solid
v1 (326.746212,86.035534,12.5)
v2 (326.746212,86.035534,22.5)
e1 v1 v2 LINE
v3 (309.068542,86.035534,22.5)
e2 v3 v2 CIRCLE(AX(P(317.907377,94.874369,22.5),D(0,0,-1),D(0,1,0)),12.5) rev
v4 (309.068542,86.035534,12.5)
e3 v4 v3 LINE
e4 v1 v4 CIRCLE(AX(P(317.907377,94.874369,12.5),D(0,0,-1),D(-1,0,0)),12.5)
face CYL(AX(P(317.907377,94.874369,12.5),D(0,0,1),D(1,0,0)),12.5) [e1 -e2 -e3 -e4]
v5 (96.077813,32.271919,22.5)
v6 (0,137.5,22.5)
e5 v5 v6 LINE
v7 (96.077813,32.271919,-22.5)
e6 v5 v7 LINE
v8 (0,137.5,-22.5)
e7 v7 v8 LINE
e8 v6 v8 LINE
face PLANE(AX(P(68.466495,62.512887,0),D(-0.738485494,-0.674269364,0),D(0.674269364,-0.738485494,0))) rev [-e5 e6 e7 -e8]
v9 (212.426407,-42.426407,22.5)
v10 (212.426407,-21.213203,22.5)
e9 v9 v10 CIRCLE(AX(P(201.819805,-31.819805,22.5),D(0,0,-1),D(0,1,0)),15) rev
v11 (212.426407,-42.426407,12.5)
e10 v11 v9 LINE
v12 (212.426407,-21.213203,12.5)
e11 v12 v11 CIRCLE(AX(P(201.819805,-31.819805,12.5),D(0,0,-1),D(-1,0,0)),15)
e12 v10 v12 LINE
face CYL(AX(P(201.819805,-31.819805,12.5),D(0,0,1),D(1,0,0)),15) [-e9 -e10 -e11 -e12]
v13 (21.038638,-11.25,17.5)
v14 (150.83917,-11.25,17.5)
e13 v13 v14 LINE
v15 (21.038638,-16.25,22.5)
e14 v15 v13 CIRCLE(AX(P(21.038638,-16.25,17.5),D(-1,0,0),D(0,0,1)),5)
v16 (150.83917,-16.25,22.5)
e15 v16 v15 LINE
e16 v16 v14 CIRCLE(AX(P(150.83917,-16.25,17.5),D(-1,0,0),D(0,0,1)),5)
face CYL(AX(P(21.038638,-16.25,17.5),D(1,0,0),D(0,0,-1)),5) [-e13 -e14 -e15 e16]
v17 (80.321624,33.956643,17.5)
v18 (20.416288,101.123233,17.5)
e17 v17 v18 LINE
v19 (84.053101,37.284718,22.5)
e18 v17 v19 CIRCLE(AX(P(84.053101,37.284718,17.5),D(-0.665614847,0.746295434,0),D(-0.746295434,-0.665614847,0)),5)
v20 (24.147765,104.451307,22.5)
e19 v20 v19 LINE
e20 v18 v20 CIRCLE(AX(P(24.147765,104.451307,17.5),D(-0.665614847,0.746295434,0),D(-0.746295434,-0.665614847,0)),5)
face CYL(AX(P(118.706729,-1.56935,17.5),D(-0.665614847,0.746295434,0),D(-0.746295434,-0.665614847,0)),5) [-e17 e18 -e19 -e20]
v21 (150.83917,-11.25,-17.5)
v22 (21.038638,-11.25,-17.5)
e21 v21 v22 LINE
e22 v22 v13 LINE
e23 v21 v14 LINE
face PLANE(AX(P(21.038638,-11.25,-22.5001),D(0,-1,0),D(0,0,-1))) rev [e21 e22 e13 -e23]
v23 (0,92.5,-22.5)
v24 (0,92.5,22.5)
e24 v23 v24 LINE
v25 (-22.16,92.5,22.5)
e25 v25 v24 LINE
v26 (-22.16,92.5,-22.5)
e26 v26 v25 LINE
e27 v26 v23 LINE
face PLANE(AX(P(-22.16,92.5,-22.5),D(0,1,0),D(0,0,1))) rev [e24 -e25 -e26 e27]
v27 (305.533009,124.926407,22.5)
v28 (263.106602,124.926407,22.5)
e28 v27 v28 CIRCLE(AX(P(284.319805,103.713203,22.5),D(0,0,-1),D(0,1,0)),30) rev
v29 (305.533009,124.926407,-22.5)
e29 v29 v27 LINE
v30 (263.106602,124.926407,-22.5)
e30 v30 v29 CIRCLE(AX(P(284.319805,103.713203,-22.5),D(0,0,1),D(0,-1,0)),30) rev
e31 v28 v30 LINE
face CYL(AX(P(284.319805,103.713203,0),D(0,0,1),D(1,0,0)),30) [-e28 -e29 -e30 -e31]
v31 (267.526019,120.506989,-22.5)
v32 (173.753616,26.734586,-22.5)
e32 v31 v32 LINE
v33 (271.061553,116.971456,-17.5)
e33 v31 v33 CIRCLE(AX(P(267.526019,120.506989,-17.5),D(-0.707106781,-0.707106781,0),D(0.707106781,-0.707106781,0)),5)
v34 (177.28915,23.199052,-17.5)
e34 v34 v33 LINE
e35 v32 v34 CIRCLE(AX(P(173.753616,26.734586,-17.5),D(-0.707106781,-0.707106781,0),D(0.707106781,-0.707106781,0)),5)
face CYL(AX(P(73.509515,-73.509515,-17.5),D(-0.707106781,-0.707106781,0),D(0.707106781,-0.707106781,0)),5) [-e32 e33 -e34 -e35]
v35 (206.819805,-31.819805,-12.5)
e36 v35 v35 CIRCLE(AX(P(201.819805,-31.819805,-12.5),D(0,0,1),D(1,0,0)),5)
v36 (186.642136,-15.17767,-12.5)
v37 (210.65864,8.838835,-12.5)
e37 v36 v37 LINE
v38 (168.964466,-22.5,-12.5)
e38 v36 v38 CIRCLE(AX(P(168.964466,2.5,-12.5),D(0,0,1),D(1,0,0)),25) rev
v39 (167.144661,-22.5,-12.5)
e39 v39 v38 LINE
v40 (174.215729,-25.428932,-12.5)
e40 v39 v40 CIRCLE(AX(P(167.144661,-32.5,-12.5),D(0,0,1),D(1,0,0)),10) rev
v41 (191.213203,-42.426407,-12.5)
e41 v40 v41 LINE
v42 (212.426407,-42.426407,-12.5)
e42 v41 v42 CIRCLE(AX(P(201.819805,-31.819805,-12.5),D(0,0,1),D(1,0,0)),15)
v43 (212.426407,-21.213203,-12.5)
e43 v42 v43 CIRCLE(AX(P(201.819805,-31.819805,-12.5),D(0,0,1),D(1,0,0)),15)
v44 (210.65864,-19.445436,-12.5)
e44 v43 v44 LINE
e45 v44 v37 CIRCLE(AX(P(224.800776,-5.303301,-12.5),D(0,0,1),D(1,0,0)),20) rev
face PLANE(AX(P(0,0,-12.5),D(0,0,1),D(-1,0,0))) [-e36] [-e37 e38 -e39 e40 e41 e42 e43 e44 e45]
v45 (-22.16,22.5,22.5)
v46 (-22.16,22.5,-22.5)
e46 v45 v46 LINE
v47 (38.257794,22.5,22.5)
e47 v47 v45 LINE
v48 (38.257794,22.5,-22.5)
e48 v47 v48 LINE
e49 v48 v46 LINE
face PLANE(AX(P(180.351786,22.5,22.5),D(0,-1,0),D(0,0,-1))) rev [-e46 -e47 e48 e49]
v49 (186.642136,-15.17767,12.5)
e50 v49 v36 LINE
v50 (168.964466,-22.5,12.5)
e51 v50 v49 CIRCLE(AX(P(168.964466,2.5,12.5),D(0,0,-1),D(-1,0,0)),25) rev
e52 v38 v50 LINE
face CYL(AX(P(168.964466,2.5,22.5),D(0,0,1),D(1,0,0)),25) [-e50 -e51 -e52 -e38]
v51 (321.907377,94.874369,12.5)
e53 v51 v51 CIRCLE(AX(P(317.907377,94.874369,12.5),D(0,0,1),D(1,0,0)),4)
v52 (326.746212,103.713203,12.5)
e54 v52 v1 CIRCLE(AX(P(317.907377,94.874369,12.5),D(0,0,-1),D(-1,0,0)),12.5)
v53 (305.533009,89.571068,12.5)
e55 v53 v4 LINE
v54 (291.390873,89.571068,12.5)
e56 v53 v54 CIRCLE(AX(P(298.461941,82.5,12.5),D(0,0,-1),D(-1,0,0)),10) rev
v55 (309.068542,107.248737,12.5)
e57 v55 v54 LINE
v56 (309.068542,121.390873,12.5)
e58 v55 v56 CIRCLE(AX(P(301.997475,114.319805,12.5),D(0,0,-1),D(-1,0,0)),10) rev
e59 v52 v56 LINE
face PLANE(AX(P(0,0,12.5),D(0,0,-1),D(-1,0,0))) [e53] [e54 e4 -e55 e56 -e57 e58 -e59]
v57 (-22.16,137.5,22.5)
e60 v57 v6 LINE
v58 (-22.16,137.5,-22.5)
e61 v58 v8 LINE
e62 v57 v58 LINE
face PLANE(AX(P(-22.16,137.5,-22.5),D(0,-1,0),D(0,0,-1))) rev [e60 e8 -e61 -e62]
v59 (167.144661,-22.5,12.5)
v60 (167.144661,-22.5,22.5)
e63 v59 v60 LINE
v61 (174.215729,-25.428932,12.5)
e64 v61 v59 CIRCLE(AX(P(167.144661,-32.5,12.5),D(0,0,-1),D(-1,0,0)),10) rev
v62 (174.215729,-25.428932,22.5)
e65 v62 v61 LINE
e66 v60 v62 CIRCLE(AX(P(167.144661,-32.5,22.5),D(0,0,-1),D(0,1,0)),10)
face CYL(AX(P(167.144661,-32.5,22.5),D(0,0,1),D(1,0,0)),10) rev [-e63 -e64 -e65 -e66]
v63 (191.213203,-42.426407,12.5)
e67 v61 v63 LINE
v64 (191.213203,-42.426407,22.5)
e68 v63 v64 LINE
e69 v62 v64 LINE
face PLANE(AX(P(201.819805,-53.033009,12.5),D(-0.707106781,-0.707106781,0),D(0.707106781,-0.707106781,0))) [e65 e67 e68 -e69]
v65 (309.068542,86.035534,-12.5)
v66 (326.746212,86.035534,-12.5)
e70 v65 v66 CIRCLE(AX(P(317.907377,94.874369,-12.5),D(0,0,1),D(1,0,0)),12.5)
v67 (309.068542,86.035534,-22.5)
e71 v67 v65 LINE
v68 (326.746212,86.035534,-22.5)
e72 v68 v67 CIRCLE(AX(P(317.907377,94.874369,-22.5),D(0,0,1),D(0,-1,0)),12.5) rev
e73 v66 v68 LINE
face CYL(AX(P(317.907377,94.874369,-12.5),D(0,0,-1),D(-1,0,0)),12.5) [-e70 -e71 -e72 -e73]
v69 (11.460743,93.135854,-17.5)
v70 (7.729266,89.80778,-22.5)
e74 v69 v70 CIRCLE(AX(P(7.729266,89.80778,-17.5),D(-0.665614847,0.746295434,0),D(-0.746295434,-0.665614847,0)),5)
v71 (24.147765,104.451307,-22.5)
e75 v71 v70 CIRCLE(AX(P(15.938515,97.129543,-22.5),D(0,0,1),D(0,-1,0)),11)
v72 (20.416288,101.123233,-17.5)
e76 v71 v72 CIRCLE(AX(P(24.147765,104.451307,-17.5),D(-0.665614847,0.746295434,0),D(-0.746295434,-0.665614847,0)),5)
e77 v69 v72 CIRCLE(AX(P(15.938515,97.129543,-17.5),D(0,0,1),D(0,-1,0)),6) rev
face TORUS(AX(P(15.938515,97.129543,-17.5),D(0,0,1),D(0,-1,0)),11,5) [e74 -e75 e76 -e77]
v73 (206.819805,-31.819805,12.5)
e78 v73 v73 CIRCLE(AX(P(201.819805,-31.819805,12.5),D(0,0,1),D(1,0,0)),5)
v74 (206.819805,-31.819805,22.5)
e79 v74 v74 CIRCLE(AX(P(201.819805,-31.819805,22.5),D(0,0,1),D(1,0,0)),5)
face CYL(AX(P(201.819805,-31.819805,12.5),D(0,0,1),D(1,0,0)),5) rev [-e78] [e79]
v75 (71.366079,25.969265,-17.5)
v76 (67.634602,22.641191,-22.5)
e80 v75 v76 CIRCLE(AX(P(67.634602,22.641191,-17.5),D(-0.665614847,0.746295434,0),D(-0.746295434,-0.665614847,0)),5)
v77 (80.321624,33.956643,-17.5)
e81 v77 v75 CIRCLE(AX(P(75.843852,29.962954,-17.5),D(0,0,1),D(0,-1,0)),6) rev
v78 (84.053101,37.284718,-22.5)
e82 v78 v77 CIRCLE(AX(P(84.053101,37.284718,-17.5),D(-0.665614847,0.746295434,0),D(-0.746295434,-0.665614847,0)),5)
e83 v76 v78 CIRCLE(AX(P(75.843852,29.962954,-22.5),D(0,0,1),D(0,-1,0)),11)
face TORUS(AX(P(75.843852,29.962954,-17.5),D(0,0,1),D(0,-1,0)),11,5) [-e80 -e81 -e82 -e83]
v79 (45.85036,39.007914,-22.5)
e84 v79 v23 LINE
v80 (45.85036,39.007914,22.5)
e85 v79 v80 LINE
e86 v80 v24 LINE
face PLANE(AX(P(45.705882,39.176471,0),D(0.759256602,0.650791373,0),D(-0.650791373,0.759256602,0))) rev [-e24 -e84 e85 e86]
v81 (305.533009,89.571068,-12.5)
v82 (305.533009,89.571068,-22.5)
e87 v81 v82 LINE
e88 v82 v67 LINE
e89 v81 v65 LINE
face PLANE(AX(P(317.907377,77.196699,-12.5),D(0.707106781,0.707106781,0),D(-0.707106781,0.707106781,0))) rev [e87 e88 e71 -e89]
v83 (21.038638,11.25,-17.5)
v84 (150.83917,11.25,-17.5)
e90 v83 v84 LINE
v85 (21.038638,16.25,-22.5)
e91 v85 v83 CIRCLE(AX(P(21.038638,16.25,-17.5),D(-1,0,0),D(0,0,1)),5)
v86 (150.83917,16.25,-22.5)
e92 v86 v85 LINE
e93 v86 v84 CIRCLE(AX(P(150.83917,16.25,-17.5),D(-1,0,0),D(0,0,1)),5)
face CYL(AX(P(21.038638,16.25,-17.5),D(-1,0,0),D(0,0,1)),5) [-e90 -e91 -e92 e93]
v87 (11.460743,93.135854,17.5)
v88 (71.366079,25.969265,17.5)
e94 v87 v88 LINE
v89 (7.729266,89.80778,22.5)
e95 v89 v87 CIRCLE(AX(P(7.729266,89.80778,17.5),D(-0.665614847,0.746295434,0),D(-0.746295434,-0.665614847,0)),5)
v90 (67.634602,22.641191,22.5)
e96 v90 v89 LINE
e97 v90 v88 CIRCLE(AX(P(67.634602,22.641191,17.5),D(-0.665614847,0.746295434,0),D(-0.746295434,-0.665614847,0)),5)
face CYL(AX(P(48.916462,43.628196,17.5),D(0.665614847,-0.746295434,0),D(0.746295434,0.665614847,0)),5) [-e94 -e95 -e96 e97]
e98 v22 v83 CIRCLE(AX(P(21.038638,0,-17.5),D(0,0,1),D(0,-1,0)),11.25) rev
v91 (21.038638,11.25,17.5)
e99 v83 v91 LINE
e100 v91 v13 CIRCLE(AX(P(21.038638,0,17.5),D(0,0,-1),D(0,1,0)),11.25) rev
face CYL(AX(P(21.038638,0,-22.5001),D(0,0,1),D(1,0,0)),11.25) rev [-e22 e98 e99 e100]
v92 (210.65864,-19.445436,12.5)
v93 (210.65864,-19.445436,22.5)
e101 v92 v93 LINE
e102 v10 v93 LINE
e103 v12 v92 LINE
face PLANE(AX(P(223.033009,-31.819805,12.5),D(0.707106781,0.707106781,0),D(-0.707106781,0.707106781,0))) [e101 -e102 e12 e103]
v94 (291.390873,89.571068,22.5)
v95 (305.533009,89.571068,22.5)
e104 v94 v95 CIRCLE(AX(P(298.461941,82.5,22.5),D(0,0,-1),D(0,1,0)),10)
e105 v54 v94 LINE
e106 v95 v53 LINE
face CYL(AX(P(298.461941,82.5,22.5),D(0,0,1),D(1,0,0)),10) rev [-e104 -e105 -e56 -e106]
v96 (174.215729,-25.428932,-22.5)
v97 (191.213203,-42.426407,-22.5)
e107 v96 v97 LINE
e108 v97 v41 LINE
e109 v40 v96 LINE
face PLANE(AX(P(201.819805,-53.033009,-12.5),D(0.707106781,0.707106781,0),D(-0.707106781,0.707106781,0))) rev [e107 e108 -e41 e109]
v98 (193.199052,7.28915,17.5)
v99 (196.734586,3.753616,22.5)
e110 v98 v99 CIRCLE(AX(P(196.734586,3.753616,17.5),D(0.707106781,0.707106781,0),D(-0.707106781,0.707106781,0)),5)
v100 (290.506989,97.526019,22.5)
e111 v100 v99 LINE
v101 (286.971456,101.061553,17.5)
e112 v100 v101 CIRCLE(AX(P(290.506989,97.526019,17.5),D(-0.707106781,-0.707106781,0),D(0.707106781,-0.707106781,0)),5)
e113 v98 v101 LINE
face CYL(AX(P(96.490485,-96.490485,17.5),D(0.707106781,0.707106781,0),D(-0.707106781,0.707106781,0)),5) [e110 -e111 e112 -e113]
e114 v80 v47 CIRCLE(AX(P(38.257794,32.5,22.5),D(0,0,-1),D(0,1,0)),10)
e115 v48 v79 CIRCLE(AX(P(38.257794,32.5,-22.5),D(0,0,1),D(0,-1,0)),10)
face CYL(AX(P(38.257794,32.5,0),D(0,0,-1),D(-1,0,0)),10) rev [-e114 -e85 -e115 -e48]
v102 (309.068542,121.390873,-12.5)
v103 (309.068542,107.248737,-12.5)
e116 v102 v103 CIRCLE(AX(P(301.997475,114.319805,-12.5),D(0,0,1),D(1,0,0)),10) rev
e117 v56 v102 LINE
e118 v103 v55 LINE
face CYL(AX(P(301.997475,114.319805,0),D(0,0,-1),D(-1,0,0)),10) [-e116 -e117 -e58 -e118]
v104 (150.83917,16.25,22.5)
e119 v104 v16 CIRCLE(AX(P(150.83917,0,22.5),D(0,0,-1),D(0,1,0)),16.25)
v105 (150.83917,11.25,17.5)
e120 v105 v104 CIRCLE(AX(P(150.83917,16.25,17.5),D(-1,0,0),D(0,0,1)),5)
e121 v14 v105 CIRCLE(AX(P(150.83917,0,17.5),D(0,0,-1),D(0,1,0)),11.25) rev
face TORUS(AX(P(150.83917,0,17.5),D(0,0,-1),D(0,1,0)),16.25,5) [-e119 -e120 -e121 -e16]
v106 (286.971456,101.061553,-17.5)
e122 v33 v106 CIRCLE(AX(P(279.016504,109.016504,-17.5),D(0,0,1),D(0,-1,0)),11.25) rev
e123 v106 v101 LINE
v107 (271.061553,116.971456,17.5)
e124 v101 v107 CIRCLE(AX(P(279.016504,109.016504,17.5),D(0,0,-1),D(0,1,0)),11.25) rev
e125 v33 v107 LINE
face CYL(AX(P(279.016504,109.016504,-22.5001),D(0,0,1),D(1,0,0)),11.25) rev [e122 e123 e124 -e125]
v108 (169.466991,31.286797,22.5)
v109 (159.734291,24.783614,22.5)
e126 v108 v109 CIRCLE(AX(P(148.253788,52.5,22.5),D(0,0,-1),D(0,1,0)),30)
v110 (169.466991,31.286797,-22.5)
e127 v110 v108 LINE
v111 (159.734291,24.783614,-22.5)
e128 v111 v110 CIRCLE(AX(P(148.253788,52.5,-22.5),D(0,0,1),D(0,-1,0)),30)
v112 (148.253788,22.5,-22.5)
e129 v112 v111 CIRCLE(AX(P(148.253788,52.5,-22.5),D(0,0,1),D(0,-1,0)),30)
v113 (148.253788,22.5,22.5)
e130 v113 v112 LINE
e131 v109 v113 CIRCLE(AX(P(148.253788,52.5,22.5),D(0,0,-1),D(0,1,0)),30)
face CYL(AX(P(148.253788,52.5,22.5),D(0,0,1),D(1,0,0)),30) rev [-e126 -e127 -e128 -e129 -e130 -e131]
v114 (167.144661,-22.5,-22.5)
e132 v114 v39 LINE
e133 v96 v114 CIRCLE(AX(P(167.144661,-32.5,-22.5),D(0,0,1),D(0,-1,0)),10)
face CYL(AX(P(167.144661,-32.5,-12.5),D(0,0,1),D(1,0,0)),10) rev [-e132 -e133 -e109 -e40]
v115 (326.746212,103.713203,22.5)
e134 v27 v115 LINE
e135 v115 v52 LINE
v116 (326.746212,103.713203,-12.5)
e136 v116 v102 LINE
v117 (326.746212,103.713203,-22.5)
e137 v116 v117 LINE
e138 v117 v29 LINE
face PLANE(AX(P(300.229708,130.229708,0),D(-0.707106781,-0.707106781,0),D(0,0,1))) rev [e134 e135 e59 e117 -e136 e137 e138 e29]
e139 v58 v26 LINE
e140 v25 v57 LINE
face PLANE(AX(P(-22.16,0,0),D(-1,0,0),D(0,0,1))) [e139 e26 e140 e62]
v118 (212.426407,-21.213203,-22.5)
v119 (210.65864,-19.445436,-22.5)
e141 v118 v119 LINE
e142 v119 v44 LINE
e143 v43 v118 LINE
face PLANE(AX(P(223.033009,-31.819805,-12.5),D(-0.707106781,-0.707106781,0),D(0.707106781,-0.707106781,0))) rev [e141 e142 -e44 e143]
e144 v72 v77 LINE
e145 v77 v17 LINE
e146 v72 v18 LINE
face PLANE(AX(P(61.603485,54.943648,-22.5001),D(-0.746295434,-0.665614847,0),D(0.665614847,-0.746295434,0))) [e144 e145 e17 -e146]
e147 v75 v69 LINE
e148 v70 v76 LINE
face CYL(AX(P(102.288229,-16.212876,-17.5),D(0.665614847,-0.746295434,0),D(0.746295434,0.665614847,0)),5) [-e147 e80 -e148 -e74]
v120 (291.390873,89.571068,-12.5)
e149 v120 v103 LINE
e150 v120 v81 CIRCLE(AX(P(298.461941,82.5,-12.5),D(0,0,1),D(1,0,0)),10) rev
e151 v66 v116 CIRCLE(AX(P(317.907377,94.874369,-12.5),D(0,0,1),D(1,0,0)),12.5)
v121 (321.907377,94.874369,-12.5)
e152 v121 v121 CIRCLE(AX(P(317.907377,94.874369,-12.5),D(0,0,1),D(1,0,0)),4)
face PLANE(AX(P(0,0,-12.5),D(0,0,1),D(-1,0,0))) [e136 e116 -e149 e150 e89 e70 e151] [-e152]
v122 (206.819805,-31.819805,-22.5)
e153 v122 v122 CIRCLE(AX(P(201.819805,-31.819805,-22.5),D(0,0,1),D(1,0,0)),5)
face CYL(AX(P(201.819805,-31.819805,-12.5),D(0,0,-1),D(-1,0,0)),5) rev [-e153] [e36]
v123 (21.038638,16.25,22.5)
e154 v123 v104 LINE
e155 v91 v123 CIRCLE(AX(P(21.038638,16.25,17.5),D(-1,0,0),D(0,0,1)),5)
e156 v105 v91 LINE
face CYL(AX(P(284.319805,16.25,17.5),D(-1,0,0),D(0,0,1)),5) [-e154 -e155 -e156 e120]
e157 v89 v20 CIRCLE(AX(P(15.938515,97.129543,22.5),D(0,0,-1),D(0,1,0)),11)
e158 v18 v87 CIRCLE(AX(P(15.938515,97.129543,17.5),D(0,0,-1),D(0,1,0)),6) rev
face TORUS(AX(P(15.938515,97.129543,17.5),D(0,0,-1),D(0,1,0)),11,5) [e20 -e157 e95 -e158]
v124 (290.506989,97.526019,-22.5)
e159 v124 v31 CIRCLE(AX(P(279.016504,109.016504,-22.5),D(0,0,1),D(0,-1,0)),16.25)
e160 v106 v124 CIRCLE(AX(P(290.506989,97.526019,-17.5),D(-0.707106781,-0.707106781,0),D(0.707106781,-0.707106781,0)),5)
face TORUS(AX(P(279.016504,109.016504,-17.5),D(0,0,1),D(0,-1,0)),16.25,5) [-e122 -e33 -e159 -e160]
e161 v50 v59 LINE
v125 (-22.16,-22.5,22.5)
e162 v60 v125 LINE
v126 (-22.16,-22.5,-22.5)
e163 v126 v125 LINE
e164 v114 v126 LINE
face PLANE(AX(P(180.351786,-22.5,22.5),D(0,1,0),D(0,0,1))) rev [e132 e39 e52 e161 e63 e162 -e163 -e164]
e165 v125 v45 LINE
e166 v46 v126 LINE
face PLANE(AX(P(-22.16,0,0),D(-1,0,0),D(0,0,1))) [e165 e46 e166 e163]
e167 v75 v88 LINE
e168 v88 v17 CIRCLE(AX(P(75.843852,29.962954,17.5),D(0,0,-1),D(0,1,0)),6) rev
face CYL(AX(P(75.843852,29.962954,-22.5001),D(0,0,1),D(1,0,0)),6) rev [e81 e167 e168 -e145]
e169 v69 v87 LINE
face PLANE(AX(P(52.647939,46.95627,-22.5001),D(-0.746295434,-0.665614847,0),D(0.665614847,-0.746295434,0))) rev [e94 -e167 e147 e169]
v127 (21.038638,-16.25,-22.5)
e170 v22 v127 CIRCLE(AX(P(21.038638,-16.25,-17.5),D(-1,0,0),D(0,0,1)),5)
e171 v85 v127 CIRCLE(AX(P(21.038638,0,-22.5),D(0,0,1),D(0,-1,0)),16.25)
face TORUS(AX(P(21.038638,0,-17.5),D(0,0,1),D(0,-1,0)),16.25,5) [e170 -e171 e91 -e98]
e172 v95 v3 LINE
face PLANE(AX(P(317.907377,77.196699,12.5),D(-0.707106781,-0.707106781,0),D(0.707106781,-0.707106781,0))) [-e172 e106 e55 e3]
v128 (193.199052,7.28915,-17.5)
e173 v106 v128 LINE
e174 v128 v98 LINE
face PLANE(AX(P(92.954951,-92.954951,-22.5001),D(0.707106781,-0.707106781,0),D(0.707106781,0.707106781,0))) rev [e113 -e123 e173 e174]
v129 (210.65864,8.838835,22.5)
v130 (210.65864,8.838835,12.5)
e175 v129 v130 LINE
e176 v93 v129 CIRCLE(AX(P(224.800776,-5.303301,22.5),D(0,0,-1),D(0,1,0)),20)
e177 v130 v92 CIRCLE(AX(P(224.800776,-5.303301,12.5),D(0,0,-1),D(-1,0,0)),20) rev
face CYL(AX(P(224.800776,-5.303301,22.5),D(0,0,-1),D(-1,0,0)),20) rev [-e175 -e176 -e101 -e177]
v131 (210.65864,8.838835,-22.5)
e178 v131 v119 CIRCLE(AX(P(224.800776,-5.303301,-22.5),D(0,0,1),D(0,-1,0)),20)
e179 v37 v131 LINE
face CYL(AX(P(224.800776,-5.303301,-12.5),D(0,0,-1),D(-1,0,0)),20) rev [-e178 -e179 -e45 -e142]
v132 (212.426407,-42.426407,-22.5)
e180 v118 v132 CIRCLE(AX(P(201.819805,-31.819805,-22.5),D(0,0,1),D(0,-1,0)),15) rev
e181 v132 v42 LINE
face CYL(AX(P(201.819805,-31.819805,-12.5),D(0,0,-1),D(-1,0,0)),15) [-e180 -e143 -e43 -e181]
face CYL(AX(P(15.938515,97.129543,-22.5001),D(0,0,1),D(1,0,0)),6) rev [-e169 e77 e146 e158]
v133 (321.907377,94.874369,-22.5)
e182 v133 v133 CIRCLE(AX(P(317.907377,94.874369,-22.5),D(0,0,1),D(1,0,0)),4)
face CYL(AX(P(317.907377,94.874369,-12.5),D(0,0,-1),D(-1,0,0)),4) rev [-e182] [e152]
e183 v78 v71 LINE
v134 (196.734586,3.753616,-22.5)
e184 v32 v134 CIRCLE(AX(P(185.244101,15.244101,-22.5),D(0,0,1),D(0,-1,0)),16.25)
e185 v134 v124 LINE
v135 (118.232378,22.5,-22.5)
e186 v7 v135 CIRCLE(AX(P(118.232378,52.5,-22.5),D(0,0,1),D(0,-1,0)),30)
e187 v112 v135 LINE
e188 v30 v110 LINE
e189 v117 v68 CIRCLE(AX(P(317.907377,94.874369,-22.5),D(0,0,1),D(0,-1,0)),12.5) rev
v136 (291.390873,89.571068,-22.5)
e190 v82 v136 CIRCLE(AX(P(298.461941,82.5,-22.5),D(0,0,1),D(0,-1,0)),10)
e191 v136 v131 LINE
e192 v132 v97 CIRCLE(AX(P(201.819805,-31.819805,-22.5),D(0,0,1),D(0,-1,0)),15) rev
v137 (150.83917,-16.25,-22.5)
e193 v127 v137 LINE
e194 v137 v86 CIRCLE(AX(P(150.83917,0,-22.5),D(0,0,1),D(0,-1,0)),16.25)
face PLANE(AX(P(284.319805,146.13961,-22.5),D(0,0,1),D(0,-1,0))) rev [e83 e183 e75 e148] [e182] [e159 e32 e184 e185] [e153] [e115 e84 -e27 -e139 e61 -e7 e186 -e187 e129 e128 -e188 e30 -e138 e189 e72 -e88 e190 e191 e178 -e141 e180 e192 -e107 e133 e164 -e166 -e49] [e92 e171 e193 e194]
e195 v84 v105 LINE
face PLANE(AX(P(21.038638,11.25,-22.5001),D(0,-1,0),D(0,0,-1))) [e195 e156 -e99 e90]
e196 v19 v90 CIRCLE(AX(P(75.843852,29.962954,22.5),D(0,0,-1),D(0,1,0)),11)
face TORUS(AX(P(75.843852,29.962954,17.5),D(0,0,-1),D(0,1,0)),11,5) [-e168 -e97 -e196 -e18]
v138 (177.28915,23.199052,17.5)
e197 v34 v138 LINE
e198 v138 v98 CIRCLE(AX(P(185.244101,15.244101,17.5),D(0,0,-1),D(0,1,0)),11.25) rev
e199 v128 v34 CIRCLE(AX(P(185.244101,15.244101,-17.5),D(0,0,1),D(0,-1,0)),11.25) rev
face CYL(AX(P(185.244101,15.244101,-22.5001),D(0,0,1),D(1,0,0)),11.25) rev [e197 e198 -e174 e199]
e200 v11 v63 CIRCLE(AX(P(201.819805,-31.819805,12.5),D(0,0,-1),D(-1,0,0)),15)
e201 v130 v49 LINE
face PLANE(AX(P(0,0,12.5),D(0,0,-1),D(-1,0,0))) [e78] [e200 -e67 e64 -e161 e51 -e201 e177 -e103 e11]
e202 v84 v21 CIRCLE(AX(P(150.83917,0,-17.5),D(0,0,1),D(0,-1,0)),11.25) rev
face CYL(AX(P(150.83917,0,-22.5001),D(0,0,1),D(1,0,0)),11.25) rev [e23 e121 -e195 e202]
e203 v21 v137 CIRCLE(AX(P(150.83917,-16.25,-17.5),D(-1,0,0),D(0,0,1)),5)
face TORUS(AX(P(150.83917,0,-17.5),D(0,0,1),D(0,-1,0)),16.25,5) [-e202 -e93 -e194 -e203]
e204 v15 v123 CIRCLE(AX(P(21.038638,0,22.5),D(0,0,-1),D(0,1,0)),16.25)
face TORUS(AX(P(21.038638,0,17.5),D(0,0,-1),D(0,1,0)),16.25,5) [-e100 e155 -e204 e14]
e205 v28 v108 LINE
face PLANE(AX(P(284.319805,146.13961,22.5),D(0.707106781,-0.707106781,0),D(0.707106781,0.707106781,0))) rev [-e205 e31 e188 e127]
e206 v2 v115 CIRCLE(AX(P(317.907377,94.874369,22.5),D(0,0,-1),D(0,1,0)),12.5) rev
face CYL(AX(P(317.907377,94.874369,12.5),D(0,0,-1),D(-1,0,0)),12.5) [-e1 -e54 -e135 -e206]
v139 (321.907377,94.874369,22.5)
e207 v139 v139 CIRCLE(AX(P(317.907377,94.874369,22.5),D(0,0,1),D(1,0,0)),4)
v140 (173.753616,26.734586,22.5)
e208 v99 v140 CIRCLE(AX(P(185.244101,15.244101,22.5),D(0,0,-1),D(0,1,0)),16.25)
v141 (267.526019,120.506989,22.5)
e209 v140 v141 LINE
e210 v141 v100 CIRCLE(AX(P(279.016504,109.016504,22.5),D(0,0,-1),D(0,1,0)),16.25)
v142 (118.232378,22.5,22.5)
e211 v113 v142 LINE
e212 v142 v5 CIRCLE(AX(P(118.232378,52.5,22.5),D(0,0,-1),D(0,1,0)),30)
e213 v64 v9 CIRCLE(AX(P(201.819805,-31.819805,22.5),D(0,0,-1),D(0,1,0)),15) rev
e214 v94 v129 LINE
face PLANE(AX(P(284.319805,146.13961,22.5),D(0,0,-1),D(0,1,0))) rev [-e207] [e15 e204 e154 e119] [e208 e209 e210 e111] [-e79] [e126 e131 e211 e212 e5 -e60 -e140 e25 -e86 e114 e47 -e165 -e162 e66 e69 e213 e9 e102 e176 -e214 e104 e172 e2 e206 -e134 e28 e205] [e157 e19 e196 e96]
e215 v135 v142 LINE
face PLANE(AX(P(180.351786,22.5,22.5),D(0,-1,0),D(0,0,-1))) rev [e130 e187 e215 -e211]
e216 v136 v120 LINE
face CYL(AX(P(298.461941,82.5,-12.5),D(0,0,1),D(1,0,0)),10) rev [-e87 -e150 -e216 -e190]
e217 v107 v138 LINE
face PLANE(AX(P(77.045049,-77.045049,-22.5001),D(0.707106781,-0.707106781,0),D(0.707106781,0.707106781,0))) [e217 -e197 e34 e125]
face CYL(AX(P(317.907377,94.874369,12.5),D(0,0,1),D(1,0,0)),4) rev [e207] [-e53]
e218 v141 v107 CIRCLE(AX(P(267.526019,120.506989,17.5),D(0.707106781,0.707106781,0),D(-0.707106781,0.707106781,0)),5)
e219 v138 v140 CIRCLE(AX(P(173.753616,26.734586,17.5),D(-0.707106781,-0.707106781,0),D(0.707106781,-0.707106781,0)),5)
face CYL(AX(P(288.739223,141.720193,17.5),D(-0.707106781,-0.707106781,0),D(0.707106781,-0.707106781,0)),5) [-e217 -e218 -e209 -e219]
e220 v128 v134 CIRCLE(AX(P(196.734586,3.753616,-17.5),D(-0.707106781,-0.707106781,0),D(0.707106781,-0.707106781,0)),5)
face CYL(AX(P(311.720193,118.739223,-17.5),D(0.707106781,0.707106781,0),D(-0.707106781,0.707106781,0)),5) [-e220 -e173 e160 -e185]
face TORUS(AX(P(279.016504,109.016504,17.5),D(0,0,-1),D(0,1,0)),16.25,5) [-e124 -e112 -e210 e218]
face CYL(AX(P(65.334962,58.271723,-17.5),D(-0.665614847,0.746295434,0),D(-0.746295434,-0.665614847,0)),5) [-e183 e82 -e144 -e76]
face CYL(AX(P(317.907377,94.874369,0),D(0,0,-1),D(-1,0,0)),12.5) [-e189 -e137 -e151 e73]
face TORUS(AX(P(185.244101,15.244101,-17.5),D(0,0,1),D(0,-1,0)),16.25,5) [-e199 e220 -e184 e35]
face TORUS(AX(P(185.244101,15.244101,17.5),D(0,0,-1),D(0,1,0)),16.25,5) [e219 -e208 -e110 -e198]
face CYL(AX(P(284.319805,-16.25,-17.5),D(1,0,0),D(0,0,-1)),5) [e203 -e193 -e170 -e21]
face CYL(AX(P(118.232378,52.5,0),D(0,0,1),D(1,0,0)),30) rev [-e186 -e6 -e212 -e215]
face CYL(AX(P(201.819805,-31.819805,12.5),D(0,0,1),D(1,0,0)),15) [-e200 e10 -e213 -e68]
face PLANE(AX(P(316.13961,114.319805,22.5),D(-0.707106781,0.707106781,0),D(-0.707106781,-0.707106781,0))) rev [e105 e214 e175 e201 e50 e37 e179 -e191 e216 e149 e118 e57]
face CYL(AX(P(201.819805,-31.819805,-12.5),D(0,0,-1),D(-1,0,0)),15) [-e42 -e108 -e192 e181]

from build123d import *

# Parameters (mm, degrees)
SKETCH1_W            = 45
SKETCH1_H            = 45
SKETCH5_R            = 5
SKETCH5_R_2          = 4
BOSS_EXTRUDE2_DEPTH  = 10
FILLET2_R            = 15
FILLET2_OF_MIRROR1_R = 15
FILLET3_R            = 10
FILLET4_R            = 30
FILLET5_R            = 30
CUT_EXTRUDE1_DEPTH   = 366.442982877
FILLET6_R            = 5
FILLET7_R            = 20
FILLET8_R            = 25
FILLET10_R           = 5
FILLET11_R           = 10
FILLET12_R           = 30
SKETCH9_W            = 45
SKETCH9_H            = 45
BOSS_EXTRUDE3_DEPTH  = 22.16
FILLET13_R           = 12.5


# Some blends are built 0.0001 mm under size
with BuildPart() as part:
    # Sweep1: sweep along a path in Sketch2
    with BuildLine(Plane.XY) as sweep1_path:
        Line((0, 0), (170, 0))
        Line((170, 0), (300.22970773, 130.22970773))
    # Sketch1 → Sweep1 (sweep)
    with BuildSketch(Plane(origin=(0, 0, 0), x_dir=(0, 0, -1), z_dir=(1, 0, 0))):
        Rectangle(SKETCH1_W, SKETCH1_H)
    sweep(path=sweep1_path.line, transition=Transition.RIGHT)

    # Sketch5 → Boss-Extrude2 (add)
    # profile 1 of 2: a face of its own
    with BuildSketch(Plane.XY.offset(22.5)):
        Polygon((201.819805153, -53.033008589), (159.393398282, -10.606601718), (180.606601718, 10.606601718), (223.033008589, -31.819805153), align=None)
        with Locations((201.819805153, -31.819805153)):
            Circle(SKETCH5_R, mode=Mode.SUBTRACT)
    # profile 2 of 2: a face of its own
    with BuildSketch(Plane.XY.offset(22.5)):
        Polygon((300.22970773, 130.22970773), (335.585046792, 94.874368674), (317.907377264, 77.196699143), (282.552038203, 112.552038203), align=None)
        with Locations((317.907377263, 94.874368672)):
            Circle(SKETCH5_R_2, mode=Mode.SUBTRACT)
    boss_extrude2 = extrude(amount=-BOSS_EXTRUDE2_DEPTH)

    # Fillet2
    fillet2_edges = [part.edges().sort_by_distance(p)[0] for p in [
        (201.819805153, -53.033008589, 17.5),
        (223.033008589, -31.819805153, 17.5),
    ]]
    fillet(fillet2_edges, radius=FILLET2_R - 0.0001)  # a hair under: the kernel refuses the full size

    # Mirror1: Boss-Extrude2 across plane
    add(boss_extrude2.mirror(Plane.XY))

    # Fillet2 of Mirror1
    fillet2_of_mirror1_edges = [part.edges().sort_by_distance(p)[0] for p in [
        (201.819805153, -53.033008589, -17.5),
        (223.033008589, -31.819805153, -17.5),
    ]]
    fillet(fillet2_of_mirror1_edges, radius=FILLET2_OF_MIRROR1_R - 0.0001)  # a hair under: the kernel refuses the full size

    # Sketch6 → Loft1 section 0
    with BuildSketch(Plane(origin=(0, 22.5, 0), x_dir=(1, 0, 0), z_dir=(0, 1, 0))):
        with BuildLine():
            Line((60, 22.5), (105, 22.5))
            Line((105, 22.5), (105, -22.5))
            Line((105, -22.5), (60, -22.5))
            Line((60, -22.5), (60, 22.5))
        make_face()
    # Sketch7 → Loft1 section 1
    with BuildSketch(Plane.ZY):
        with BuildLine():
            Line((-22.5, 137.5), (22.5, 137.5))
            Line((22.5, 137.5), (22.5, 92.5))
            Line((22.5, 92.5), (-22.5, 92.5))
            Line((-22.5, 92.5), (-22.5, 137.5))
        make_face()
    loft()

    # Fillet3
    fillet3_edges = [part.edges().sort_by_distance(p)[0] for p in [
        (60, 22.5, 0),
        (298.46194078, 96.642135627, 17.5),
        (298.46194078, 96.642135627, -17.5),
        (171.286796564, -22.5, -17.5),
        (171.286796564, -22.5, 17.5),
    ]]
    fillet(fillet3_edges, radius=FILLET3_R)

    # Fillet4
    fillet4_edges = [part.edges().sort_by_distance(p)[0] for p in [
        (284.319805153, 146.139610307, 0),
    ]]
    fillet(fillet4_edges, radius=FILLET4_R)

    # Fillet5
    fillet5_edges = [part.edges().sort_by_distance(p)[0] for p in [
        (105, 22.5, 0),
    ]]
    fillet(fillet5_edges, radius=FILLET5_R)

    # Sketch8 → Cut-Extrude1 (cut, through all)
    with BuildSketch(Plane.XY.offset(22.5)):
        with BuildLine():
            Line((150.8391696, 11.25), (21.038638364, 11.25))
            ThreePointArc((21.038638364, 11.25), (9.788638364, 0), (21.038638364, -11.25))
            Line((21.038638364, -11.25), (150.8391696, -11.25))
            ThreePointArc((150.8391696, -11.25), (162.0891696, 0), (150.8391696, 11.25))
        make_face()
        with BuildLine():
            Line((271.061553006, 116.971455583), (177.289149721, 23.199052298))
            ThreePointArc((177.289149721, 23.199052298), (177.289149721, 7.289149721), (193.199052298, 7.289149721))
            Line((193.199052298, 7.289149721), (286.971455583, 101.061553006))
            ThreePointArc((286.971455583, 101.061553006), (286.971455583, 116.971455583), (271.061553006, 116.971455583))
        make_face()
        with BuildLine():
            Line((80.321624137, 33.956643426), (20.416287911, 101.123232529))
            ThreePointArc((20.416287911, 101.123232529), (11.944826222, 101.607316054), (11.460742697, 93.135854365))
            Line((11.460742697, 93.135854365), (71.366078924, 25.969265263))
            ThreePointArc((71.366078924, 25.969265263), (75.501552787, 23.972726338), (79.837540612, 25.485181738))
            ThreePointArc((79.837540612, 25.485181738), (81.834079537, 29.620655601), (80.321624137, 33.956643426))
        make_face()
    extrude(amount=-CUT_EXTRUDE1_DEPTH, mode=Mode.SUBTRACT)

    # Fillet6
    fillet6_edges = [part.edges().sort_by_distance(p)[0] for p in [
        (85.938903982, -11.25, -22.5),
        (162.0891696, 0, -22.5),
        (85.938903982, 11.25, -22.5),
        (9.788638364, 0, -22.5),
        (286.971455583, 116.971455583, -22.5),
        (224.175351363, 70.08525394, -22.5),
        (177.289149721, 7.289149721, -22.5),
        (240.08525394, 54.175351363, -22.5),
        (224.175351363, 70.08525394, 22.5),
        (240.08525394, 54.175351363, 22.5),
        (286.971455583, 116.971455583, 22.5),
        (177.289149721, 7.289149721, 22.5),
        (50.368956024, 67.539937978, 22.5),
        (41.41341081, 59.552559814, 22.5),
        (79.837540612, 25.485181738, 22.5),
        (11.944826222, 101.607316054, 22.5),
        (85.938903982, 11.25, 22.5),
        (9.788638364, 0, 22.5),
        (85.938903982, -11.25, 22.5),
        (162.0891696, 0, 22.5),
    ]]
    fillet(fillet6_edges, radius=FILLET6_R)

    # Fillet7
    fillet7_edges = [part.edges().sort_by_distance(p)[0] for p in [
        (196.516504294, -5.303300859, -17.5),
        (196.516504294, -5.303300859, 17.5),
    ]]
    fillet(fillet7_edges, radius=FILLET7_R)

    # Fillet8
    fillet8_edges = [part.edges().sort_by_distance(p)[0] for p in [
        (179.319805153, -22.5, 0),
    ]]
    fillet(fillet8_edges, radius=FILLET8_R)

    # Fillet10
    fillet10_edges = [part.edges().sort_by_distance(p)[0] for p in [
        (79.837540612, 25.485181738, -22.5),
        (50.368956024, 67.539937978, -22.5),
        (11.944826222, 101.607316054, -22.5),
        (41.41341081, 59.552559814, -22.5),
    ]]
    fillet(fillet10_edges, radius=FILLET10_R)

    # Fillet11
    # the kernel refuses this fillet: 10 mm, written as the material it takes off along each edge
    with BuildSketch(Plane(origin=(316.139610307, 114.319805153, 12.5), x_dir=(-0.7071067811865511, -0.707106781186544, 0), z_dir=(0, 0, -1))) as fillet11_piece_1:
        with BuildLine():
            CenterArc((FILLET11_R, FILLET11_R), FILLET11_R, 180, 90)
            Line((0, FILLET11_R), (0, 0))
            Line((0, 0), (FILLET11_R, 0))
        make_face()
    extrude(amount=25, mode=Mode.SUBTRACT)

    # Fillet12
    fillet12_edges = [part.edges().sort_by_distance(p)[0] for p in [
        (160.680194847, 22.5, 0),
    ]]
    fillet(fillet12_edges, radius=FILLET12_R)

    # Sketch9 → Boss-Extrude3 (add)
    with BuildSketch(Plane.ZY):
        Rectangle(SKETCH9_W, SKETCH9_H)
        with Locations((0, 115)):
            Rectangle(SKETCH9_W, SKETCH9_H)
    extrude(amount=BOSS_EXTRUDE3_DEPTH)

    # Fillet13
    fillet13_edges = [part.edges().sort_by_distance(p)[0] for p in [
        (335.585046792, 94.874368674, -17.5),
        (317.907377264, 77.196699143, -17.5),
        (317.907377264, 77.196699143, 17.5),
        (335.585046792, 94.874368674, 17.5),
    ]]
    fillet(fillet13_edges, radius=FILLET13_R - 0.0001)  # a hair under: the kernel refuses the full size


solid = part.part
